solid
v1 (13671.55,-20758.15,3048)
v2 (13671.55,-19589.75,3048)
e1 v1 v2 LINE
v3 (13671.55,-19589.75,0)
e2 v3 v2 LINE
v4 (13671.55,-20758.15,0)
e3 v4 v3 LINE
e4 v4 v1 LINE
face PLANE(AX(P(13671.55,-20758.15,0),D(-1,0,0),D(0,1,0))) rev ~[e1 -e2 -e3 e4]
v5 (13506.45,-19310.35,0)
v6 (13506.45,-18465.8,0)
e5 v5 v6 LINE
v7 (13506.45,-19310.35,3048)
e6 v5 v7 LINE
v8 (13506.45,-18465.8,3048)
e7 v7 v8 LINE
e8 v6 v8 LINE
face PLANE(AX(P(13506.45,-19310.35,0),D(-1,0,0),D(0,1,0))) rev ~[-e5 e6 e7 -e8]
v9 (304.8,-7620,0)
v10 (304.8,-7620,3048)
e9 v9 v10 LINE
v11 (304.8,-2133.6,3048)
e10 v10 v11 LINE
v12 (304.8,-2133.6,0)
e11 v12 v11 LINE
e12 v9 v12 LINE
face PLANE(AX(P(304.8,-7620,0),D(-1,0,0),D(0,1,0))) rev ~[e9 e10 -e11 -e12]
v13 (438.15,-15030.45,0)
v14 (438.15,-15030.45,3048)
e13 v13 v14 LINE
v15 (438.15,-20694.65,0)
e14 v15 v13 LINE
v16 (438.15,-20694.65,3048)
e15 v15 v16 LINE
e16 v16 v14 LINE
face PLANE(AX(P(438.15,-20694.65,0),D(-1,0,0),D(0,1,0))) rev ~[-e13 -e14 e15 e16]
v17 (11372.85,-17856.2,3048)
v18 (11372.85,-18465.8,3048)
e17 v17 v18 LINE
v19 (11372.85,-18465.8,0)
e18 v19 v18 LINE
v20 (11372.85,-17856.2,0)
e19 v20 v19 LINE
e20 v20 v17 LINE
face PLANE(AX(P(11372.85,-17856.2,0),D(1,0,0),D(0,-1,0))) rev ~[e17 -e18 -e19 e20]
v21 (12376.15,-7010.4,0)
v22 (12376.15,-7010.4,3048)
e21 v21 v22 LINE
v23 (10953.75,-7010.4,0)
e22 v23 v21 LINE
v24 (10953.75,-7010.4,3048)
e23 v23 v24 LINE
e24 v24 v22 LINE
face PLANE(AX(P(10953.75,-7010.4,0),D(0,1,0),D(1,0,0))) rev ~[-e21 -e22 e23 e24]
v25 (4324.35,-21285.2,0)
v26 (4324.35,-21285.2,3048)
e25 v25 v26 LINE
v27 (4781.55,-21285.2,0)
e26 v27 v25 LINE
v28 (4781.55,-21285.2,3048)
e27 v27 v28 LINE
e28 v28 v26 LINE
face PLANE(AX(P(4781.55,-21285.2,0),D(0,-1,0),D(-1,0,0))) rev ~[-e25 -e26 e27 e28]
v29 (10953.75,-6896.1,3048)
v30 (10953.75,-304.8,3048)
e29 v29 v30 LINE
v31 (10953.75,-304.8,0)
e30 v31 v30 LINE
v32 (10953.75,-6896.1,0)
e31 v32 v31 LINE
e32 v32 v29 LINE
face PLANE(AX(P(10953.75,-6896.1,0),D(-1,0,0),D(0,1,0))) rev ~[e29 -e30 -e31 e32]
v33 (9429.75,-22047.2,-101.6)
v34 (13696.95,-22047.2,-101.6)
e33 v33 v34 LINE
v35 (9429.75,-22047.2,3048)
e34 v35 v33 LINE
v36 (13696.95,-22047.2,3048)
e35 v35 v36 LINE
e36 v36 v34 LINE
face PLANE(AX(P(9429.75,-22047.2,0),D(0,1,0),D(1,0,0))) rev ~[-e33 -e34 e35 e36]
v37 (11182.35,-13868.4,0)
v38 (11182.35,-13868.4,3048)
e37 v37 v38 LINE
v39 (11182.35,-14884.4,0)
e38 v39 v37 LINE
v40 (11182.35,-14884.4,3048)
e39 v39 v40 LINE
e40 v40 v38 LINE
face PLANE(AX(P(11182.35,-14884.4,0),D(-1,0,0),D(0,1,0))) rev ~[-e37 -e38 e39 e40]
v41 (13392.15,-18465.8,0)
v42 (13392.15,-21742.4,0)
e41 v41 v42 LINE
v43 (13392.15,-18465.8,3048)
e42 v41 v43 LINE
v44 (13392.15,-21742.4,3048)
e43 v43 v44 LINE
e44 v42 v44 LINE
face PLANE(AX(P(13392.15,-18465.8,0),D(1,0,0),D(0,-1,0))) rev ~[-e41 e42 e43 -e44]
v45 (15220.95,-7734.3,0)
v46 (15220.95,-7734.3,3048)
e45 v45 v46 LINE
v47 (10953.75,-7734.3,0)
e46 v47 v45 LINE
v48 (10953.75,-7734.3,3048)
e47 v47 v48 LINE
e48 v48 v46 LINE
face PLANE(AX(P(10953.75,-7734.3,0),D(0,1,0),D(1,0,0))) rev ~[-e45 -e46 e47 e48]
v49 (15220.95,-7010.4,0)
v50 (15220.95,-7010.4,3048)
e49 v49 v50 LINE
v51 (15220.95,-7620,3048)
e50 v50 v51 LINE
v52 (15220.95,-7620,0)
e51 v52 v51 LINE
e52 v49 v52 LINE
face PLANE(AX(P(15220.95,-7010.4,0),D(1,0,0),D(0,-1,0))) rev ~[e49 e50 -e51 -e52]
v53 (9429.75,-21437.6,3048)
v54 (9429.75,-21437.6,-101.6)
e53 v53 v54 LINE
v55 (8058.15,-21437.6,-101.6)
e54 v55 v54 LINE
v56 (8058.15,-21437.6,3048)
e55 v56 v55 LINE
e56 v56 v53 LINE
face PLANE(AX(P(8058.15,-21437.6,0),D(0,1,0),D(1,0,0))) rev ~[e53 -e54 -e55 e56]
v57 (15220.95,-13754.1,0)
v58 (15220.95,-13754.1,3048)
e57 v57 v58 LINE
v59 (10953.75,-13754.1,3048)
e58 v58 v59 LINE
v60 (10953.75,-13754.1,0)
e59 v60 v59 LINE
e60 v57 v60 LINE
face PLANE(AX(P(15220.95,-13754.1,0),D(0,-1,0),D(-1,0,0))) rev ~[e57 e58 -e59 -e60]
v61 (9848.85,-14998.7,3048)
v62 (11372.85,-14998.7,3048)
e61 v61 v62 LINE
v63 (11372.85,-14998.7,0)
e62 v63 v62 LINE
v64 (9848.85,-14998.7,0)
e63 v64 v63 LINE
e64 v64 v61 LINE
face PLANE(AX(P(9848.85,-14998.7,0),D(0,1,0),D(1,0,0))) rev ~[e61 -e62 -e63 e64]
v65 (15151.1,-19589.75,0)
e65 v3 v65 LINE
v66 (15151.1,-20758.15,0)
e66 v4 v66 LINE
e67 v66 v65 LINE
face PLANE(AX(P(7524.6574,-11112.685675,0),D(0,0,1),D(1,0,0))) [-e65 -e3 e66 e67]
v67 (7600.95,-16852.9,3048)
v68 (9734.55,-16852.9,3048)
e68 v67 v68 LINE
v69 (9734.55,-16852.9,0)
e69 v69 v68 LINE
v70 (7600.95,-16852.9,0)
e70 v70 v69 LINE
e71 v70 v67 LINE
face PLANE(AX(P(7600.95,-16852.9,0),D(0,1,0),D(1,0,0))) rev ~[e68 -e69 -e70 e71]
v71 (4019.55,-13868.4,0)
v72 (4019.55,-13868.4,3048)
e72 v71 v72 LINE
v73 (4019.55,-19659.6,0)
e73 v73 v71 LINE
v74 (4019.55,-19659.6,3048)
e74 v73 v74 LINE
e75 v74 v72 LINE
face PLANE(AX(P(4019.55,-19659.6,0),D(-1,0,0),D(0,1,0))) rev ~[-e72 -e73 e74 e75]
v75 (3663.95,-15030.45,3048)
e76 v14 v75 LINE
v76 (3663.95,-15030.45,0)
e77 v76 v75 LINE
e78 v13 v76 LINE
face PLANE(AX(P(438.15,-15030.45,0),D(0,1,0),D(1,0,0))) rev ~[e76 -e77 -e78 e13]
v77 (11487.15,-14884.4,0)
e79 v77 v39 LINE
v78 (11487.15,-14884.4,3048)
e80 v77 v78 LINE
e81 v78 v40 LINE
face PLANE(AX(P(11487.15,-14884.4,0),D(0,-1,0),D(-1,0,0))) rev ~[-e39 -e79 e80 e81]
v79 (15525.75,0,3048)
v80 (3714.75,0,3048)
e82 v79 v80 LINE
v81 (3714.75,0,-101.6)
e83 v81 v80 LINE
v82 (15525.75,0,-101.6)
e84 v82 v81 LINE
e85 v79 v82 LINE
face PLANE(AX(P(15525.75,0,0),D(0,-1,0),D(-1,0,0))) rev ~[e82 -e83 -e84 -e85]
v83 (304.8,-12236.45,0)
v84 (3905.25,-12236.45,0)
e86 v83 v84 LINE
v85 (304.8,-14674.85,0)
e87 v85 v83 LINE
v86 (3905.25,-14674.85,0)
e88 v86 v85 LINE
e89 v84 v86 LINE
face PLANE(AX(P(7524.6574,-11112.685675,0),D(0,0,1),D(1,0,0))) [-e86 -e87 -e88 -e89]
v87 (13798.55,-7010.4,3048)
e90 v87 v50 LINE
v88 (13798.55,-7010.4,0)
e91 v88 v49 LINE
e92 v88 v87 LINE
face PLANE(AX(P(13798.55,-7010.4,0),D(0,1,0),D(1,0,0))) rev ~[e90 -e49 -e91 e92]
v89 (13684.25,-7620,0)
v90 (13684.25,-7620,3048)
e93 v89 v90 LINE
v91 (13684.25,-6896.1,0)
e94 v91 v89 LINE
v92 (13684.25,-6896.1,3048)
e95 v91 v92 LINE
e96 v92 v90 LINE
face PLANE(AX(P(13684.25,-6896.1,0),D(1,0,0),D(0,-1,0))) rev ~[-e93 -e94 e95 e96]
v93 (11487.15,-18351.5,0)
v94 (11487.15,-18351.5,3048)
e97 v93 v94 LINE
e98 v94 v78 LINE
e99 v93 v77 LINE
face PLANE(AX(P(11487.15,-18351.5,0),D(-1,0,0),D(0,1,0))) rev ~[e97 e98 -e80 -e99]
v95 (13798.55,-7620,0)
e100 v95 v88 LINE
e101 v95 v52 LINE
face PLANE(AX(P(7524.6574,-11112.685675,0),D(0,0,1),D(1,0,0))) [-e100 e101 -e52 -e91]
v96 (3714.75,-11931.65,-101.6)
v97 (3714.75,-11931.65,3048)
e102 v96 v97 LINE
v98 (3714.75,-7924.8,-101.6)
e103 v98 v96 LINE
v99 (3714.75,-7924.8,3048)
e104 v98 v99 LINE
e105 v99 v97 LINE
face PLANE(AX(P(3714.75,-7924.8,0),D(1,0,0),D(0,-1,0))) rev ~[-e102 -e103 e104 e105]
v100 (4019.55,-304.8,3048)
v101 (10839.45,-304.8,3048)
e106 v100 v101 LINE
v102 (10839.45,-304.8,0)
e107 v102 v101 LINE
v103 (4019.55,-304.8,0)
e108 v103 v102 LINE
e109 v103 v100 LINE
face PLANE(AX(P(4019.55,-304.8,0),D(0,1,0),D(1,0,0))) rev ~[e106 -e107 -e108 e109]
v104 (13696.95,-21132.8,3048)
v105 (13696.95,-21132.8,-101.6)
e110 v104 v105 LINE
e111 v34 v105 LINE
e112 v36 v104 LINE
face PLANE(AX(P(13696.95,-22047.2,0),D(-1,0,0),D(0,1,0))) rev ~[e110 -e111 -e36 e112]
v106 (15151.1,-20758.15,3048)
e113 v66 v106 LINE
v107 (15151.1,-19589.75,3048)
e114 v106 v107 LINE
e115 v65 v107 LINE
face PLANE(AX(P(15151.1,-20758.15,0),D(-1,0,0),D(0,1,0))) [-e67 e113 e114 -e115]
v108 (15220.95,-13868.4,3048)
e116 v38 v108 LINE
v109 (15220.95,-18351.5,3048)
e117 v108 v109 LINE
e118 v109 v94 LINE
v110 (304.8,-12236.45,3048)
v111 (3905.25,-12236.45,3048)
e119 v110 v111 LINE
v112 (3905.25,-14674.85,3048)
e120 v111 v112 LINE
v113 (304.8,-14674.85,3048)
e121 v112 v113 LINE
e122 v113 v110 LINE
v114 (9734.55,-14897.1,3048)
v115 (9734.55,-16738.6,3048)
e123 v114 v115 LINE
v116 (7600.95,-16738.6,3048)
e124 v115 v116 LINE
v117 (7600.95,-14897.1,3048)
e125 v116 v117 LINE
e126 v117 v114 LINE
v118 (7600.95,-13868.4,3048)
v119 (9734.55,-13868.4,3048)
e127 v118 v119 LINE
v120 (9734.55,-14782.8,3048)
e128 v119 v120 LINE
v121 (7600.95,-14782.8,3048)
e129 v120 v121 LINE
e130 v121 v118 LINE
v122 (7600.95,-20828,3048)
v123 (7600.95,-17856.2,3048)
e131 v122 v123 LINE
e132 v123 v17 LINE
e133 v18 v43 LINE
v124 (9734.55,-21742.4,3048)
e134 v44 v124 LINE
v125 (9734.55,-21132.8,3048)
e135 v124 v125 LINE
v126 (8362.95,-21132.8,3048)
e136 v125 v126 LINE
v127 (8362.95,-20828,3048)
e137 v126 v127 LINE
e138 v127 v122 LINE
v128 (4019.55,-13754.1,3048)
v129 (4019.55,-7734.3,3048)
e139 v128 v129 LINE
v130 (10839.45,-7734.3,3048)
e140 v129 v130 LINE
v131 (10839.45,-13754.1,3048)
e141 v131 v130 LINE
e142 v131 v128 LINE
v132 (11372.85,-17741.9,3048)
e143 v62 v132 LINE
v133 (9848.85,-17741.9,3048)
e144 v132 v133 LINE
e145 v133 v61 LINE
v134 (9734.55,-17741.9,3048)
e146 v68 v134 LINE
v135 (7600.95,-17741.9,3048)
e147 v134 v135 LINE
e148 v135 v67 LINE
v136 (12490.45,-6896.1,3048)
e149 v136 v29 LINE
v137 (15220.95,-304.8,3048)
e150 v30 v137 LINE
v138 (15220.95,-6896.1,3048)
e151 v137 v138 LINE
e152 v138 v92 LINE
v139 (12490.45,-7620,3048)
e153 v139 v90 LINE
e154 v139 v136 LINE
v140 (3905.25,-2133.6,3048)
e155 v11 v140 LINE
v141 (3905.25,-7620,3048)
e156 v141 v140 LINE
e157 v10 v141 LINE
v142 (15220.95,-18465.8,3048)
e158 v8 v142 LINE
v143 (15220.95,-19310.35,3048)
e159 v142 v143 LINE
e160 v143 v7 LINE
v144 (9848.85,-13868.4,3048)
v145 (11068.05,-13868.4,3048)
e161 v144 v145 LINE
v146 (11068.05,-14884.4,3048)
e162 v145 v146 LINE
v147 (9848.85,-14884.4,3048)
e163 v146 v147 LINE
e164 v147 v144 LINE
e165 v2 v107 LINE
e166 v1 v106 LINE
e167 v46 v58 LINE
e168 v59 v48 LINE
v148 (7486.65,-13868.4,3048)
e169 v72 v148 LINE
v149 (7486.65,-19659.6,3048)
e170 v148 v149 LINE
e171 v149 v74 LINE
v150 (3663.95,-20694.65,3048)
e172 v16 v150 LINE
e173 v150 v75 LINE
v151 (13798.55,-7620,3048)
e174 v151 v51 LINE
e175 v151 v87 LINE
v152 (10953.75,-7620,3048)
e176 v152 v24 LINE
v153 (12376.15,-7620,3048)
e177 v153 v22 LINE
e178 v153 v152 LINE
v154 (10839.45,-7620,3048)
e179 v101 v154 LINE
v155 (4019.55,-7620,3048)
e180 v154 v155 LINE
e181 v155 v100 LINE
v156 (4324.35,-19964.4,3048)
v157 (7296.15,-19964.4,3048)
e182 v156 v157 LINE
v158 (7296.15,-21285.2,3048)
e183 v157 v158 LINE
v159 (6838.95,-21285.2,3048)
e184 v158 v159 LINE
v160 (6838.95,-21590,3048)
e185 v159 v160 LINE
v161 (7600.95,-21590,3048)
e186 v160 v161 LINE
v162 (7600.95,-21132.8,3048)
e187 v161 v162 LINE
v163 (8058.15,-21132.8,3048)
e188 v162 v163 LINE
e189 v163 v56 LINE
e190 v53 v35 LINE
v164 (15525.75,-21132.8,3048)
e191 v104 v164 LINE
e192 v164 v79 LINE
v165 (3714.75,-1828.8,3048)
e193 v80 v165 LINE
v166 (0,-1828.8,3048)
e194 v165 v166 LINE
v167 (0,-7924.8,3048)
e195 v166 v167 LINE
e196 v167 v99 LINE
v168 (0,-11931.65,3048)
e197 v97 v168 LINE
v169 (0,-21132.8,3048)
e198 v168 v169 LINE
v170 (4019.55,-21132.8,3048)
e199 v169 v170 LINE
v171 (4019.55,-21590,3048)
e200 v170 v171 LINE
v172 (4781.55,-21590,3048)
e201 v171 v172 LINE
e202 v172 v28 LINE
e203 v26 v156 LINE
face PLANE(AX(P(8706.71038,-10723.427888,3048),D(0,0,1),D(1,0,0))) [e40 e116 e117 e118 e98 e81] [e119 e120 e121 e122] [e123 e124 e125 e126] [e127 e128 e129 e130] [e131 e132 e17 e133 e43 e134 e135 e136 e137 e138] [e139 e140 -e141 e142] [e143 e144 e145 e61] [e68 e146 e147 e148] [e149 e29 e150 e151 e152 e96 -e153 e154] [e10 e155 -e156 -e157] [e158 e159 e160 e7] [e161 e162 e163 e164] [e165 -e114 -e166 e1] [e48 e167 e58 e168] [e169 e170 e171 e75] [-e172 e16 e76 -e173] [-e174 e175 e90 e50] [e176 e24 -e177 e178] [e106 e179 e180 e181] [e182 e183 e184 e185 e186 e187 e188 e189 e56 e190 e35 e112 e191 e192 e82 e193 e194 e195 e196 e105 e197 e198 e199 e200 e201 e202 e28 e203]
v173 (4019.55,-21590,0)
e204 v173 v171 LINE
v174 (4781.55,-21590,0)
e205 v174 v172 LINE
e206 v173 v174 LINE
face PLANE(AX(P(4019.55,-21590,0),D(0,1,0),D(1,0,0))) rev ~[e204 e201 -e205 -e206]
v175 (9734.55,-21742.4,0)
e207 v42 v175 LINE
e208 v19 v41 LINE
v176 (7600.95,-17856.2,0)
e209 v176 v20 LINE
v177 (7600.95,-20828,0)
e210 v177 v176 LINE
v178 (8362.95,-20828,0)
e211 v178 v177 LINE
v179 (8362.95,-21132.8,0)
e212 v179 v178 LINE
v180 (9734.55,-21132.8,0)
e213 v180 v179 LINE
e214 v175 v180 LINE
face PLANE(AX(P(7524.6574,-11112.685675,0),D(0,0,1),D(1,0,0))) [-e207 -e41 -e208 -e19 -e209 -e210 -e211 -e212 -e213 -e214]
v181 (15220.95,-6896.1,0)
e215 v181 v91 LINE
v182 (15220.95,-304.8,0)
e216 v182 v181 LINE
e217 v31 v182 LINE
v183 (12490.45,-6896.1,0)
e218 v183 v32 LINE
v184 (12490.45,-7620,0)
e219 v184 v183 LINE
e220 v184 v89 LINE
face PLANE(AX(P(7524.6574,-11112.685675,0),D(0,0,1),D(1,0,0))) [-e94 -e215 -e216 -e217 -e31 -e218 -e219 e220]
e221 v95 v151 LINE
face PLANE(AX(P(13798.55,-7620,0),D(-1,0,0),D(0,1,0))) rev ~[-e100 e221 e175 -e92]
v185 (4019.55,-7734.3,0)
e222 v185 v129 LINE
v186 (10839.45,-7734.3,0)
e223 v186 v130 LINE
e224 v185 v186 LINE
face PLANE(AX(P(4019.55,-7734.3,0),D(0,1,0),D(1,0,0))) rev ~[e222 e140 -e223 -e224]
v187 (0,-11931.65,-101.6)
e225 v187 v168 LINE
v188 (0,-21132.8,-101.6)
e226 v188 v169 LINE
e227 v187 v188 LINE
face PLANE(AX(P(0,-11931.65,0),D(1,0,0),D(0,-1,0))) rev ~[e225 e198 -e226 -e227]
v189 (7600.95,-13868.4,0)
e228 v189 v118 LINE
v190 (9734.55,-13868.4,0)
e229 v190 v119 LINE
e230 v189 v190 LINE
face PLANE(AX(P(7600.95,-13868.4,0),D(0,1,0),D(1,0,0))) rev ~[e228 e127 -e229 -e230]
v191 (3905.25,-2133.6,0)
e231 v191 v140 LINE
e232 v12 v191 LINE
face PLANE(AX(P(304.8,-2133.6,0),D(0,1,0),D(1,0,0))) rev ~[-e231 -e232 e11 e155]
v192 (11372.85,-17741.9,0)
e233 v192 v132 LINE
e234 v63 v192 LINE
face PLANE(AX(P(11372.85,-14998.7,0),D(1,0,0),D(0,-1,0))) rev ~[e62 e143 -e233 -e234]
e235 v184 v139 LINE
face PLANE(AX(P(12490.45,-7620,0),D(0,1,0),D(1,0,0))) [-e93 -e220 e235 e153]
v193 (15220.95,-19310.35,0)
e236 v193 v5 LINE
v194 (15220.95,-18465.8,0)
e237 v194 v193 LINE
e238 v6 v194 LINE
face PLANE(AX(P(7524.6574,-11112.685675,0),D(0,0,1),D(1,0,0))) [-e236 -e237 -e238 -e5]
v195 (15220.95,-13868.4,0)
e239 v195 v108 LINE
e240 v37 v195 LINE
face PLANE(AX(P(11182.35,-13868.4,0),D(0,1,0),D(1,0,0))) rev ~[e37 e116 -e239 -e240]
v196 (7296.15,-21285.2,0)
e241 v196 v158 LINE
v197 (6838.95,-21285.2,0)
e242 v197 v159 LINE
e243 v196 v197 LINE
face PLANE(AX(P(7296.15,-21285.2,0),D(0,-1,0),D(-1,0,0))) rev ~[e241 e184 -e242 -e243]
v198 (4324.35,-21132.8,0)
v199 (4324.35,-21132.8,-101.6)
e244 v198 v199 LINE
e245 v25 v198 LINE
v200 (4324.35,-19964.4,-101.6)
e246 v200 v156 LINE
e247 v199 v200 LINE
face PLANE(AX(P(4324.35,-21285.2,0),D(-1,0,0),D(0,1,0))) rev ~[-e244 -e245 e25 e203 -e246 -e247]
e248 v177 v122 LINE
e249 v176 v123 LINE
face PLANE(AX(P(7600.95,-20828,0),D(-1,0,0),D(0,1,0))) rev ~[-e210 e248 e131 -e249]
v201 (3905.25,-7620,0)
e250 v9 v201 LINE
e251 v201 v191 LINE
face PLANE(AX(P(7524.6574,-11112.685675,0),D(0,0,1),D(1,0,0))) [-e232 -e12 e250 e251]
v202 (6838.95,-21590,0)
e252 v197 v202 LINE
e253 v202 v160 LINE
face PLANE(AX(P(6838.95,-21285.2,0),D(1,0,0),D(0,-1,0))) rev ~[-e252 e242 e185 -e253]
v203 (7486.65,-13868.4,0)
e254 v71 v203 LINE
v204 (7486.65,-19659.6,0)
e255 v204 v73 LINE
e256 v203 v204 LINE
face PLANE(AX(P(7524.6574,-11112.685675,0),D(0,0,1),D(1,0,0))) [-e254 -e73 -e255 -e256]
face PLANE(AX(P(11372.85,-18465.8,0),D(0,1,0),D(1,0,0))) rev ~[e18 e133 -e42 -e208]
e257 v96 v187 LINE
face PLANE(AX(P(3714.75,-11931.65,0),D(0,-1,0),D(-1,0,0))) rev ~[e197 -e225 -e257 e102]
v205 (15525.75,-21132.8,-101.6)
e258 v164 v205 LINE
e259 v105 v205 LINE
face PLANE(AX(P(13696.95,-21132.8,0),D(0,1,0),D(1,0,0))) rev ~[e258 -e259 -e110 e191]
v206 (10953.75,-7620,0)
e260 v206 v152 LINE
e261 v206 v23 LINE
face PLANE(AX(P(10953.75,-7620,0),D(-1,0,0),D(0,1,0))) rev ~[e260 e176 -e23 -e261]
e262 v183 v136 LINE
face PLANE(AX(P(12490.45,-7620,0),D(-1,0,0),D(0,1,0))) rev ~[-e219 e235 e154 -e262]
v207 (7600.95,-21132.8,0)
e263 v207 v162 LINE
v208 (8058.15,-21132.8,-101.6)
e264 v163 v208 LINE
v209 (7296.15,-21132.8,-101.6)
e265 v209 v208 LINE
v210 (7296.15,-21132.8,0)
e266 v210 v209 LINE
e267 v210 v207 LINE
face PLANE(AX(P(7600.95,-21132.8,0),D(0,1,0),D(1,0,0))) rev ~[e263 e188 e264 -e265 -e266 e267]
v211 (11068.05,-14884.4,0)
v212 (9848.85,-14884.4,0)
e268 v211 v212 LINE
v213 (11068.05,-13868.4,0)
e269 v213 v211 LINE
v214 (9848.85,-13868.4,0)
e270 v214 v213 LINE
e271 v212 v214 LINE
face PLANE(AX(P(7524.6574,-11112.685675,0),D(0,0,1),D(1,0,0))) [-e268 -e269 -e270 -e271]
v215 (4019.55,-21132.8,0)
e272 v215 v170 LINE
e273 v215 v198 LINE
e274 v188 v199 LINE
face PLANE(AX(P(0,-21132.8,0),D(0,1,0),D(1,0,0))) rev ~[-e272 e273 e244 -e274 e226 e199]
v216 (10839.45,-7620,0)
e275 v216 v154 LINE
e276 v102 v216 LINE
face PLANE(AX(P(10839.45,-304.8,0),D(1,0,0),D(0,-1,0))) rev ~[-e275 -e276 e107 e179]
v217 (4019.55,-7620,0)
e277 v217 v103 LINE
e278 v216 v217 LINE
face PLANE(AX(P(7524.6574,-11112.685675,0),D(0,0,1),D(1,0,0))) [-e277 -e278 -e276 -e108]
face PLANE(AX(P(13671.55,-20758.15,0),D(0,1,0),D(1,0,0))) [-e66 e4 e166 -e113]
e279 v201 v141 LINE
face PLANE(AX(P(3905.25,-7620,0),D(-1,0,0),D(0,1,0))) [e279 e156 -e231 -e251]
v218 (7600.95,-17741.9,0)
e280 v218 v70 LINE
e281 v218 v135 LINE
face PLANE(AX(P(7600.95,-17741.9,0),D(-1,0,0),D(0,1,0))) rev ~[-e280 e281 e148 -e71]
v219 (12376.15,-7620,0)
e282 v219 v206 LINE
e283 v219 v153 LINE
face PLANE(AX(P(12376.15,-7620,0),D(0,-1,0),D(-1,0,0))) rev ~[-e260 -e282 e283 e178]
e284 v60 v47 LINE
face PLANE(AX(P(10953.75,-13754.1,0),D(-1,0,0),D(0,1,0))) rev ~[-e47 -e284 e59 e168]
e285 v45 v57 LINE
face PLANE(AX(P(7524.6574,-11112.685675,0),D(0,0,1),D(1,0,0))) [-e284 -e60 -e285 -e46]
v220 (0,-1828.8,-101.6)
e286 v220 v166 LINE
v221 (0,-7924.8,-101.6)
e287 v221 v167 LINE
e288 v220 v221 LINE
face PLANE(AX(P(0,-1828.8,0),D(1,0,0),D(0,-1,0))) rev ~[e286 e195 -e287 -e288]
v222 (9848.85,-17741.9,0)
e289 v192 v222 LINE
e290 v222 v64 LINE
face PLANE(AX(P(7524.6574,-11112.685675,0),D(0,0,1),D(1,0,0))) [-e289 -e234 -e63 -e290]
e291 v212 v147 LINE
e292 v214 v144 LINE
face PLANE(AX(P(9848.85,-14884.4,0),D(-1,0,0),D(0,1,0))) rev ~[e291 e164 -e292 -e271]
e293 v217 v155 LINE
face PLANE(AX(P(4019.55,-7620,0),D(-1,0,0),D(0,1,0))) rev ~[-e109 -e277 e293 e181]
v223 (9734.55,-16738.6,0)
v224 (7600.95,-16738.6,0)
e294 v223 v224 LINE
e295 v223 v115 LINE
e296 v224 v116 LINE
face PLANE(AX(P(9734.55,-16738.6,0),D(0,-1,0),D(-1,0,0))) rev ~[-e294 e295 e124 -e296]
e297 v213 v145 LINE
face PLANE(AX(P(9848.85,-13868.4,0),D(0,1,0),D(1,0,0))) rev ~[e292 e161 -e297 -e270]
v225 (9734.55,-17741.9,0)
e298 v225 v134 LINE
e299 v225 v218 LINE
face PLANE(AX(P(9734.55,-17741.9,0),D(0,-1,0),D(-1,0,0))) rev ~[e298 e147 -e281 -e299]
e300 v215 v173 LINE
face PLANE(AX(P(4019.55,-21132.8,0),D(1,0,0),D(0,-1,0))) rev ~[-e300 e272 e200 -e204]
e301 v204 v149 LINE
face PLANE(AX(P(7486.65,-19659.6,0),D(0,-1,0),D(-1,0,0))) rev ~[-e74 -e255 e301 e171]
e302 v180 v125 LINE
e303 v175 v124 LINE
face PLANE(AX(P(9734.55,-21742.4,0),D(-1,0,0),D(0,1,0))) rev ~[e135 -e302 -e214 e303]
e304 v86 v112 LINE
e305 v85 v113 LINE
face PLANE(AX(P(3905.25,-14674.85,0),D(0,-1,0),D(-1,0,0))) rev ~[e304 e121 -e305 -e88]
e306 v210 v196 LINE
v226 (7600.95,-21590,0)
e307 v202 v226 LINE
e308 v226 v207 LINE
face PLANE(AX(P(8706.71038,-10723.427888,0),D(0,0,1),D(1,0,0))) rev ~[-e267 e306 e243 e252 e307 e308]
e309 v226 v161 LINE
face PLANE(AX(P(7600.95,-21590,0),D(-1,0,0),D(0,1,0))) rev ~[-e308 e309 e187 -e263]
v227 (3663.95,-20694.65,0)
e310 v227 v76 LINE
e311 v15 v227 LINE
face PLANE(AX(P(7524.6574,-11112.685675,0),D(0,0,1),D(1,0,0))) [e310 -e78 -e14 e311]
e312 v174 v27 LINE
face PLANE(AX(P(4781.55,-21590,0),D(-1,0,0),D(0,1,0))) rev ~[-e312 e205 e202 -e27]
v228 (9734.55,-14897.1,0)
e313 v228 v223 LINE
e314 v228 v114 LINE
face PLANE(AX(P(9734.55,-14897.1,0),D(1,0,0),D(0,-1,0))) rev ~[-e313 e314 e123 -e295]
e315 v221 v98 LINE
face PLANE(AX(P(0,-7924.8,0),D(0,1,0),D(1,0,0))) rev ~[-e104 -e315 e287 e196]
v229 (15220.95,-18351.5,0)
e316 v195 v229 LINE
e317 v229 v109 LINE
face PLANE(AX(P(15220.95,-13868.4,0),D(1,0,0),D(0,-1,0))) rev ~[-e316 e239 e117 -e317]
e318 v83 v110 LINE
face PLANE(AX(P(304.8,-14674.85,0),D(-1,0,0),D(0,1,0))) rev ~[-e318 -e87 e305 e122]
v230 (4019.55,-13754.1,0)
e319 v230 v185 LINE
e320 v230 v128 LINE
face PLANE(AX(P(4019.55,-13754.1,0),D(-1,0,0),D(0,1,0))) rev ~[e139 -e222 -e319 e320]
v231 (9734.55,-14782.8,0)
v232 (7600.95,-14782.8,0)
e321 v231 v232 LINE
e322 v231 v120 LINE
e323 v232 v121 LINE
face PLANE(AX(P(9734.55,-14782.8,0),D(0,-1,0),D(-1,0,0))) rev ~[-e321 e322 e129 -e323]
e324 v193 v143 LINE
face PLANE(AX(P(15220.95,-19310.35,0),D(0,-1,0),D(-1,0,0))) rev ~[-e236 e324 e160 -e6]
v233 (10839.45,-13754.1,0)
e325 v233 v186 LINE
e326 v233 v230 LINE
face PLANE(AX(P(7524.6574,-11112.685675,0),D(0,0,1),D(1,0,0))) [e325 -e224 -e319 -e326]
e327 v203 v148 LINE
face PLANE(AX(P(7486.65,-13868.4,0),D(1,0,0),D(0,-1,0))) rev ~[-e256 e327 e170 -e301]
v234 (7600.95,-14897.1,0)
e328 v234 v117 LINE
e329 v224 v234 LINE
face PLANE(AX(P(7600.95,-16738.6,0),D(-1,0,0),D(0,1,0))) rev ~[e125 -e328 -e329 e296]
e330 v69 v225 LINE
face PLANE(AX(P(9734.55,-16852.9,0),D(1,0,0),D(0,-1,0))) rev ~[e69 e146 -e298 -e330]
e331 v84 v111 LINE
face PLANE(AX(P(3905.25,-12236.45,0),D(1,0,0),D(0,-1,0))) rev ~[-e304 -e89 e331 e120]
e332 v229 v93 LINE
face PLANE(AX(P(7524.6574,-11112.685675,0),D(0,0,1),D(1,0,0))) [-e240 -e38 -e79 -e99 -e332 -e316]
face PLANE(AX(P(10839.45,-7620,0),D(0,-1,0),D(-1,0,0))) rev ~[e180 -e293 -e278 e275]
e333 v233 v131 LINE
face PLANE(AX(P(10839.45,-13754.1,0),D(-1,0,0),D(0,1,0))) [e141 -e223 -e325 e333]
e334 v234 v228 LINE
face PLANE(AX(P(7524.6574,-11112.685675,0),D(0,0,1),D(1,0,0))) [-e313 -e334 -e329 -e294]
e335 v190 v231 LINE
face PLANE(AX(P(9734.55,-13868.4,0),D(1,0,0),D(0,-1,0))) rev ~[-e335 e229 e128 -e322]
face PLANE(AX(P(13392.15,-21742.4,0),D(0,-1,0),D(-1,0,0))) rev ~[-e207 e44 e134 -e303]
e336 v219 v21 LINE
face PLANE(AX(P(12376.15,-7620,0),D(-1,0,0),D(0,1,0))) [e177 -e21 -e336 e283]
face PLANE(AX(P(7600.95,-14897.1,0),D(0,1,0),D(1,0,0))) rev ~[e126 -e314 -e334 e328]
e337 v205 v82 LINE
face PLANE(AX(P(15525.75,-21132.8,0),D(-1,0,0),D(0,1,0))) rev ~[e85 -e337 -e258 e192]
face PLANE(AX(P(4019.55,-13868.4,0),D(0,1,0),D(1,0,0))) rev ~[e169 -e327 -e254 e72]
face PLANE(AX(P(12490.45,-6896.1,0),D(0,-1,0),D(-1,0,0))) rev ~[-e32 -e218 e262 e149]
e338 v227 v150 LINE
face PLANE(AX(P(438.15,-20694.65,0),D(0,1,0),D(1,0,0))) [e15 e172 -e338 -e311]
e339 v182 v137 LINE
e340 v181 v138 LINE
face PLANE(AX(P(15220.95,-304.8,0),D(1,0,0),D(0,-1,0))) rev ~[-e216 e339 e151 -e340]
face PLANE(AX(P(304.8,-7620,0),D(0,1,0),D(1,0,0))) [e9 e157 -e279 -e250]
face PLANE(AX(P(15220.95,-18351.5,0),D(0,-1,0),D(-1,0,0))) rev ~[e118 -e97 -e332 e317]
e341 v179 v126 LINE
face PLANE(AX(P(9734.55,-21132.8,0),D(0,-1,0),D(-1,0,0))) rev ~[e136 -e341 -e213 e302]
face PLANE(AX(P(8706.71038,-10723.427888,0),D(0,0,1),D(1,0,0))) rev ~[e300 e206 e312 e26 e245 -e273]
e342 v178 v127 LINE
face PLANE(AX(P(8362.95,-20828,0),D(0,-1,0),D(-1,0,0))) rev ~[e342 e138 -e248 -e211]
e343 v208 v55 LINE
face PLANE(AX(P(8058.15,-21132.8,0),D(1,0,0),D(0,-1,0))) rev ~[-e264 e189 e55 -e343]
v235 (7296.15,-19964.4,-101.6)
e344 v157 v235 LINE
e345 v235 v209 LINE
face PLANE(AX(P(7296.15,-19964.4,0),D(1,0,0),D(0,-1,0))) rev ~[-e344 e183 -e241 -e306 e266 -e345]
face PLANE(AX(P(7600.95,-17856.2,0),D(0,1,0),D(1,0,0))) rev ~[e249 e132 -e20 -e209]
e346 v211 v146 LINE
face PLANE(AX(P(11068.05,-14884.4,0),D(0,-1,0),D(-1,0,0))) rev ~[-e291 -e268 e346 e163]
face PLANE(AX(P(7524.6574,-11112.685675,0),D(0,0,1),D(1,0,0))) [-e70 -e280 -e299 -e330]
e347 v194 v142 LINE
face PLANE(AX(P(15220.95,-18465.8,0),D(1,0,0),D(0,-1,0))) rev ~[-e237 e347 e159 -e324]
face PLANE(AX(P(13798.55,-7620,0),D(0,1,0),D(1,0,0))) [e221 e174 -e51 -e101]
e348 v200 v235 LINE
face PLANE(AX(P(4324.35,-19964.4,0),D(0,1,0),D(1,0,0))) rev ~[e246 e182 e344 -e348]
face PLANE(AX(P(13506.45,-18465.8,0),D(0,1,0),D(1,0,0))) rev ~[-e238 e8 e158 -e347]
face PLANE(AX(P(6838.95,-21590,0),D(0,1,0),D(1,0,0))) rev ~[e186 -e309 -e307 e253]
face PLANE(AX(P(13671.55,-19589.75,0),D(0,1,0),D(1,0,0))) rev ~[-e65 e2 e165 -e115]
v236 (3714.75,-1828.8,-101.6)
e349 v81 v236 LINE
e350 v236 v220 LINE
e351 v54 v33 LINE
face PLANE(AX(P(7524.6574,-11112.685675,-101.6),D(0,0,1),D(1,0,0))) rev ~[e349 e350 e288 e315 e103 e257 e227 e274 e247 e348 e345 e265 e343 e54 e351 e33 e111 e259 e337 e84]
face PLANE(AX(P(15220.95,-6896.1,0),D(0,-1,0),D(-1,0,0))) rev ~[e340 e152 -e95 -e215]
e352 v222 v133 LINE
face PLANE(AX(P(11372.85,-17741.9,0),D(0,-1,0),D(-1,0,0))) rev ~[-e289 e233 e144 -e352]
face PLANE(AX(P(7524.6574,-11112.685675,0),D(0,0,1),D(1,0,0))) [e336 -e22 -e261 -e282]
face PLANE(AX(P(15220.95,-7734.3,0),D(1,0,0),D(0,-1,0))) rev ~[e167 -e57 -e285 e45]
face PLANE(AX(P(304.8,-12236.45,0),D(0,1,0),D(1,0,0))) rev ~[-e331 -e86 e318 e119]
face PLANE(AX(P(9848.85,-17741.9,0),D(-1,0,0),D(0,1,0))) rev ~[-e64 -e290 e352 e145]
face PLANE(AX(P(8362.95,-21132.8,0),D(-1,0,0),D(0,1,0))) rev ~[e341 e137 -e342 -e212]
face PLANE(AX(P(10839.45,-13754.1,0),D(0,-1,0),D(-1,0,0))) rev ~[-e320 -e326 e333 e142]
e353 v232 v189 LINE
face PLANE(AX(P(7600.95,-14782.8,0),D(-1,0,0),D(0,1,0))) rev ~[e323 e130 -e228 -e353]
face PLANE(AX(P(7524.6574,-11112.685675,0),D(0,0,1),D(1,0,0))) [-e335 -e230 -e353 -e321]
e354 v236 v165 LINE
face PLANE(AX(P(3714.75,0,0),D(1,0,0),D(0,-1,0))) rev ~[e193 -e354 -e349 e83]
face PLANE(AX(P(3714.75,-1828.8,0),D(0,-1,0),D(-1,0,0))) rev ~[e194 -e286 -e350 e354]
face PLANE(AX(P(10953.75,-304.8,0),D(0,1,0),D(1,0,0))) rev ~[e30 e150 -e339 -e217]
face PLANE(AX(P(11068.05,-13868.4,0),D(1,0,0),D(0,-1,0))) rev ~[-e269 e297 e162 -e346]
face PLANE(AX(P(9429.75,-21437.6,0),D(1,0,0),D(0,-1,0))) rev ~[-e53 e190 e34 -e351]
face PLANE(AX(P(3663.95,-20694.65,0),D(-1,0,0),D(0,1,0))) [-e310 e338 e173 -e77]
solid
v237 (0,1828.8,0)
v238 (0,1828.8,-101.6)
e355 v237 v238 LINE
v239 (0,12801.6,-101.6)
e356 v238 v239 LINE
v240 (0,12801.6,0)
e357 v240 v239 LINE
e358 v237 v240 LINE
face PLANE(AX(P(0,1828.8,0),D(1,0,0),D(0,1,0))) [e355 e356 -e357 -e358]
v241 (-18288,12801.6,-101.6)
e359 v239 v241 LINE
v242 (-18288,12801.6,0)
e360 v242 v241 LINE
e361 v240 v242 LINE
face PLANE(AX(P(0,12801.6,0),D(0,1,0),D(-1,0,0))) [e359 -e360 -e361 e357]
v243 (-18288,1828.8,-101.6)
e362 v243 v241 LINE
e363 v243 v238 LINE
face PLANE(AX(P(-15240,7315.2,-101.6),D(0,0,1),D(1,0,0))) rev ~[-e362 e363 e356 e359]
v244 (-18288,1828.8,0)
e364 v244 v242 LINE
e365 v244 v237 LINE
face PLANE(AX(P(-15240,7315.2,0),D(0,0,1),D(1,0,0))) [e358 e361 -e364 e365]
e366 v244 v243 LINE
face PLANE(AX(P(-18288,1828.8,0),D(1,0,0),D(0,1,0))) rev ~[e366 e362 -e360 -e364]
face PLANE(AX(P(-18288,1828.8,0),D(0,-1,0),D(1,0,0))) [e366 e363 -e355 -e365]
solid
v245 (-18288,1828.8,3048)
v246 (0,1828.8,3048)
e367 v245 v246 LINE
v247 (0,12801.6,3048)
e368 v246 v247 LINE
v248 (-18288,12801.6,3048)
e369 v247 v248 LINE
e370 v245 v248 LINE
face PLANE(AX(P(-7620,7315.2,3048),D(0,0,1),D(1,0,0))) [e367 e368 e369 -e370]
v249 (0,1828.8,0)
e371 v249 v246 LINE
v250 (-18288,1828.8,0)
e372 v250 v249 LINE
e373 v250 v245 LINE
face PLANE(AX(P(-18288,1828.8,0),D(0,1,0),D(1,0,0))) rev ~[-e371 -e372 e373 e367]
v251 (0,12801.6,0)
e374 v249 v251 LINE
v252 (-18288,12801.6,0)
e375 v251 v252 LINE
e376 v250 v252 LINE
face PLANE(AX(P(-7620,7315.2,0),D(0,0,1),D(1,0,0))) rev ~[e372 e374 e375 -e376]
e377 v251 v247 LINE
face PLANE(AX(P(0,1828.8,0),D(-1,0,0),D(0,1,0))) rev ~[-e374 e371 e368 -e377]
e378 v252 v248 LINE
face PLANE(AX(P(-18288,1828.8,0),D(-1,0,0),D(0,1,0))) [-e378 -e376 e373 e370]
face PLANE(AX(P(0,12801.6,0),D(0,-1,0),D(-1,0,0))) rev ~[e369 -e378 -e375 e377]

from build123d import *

# Parameters (mm, degrees)
F2_DEPTH = 101.6
F0_W     = 6096
F0_H     = 10972.8
F0_W_2   = 9144
F0_W_3   = 3048
F0_W_4   = 3600.45
F0_H_2   = 5486.4
F0_W_5   = 3225.8
F0_H_3   = 5664.2
F0_W_6   = 114.3
F0_H_4   = 6019.8
F0_H_5   = 609.6
F0_W_7   = 1422.4
F0_H_6   = 114.3
F0_W_8   = 1193.8
F0_H_7   = 76.2
F0_H_8   = 863.6
F0_W_9   = 254
F0_W_10  = 1219.2
F0_H_9   = 844.55
F0_W_11  = 1479.55
F0_H_10  = 1168.4
F3_DEPTH = 3048


with BuildPart() as f2:
    # F1 (on Top) → F2 (new body)
    with BuildSketch(Plane.XY):
        Polygon((3714.75, -11931.65), (0, -11931.65), (0, -21132.8), (4324.35, -21132.8), (4324.35, -19964.4), (7296.15, -19964.4), (7296.15, -21132.8), (8058.15, -21132.8), (8058.15, -21437.6), (9429.75, -21437.6), (9429.75, -22047.2), (13696.95, -22047.2), (13696.95, -21132.8), (15525.75, -21132.8), (15525.75, 0), (3714.75, 0), (3714.75, -1828.8), (0, -1828.8), (0, -7924.8), (3714.75, -7924.8), align=None)
    extrude(amount=-F2_DEPTH)

    # F0 (on Top) → F3 (join)
    with BuildSketch(Plane.XY):
        Polygon((15525.75, 0), (3714.75, 0), (3714.75, -1828.8), (0, -1828.8), (0, -7924.8), (3714.75, -7924.8), (3714.75, -11931.65), (0, -11931.65), (0, -14674.85), (304.8, -14674.85), (304.8, -12236.45), (3905.25, -12236.45), (3905.25, -14674.85), (4019.55, -14674.85), (4019.55, -13868.4), (4019.55, -13754.1), (4019.55, -7734.3), (4019.55, -7620), (4019.55, -304.8), (10839.45, -304.8), (10953.75, -304.8), (15220.95, -304.8), (15220.95, -6896.1), (15220.95, -7010.4), (15220.95, -7620), (15220.95, -7734.3), (15220.95, -13754.1), (15220.95, -13868.4), (15220.95, -18351.5), (15220.95, -18465.8), (15220.95, -19310.35), (15430.5, -19310.35), (15430.5, -21037.55), (13392.15, -21037.55), (13392.15, -21742.4), (9734.55, -21742.4), (9734.55, -21132.8), (8362.95, -21132.8), (8362.95, -20828), (7600.95, -20828), (7600.95, -19659.6), (7486.65, -19659.6), (4019.55, -19659.6), (4019.55, -21132.8), (4019.55, -21590), (4781.55, -21590), (4781.55, -21285.2), (4324.35, -21285.2), (4324.35, -19964.4), (7296.15, -19964.4), (7296.15, -21285.2), (6838.95, -21285.2), (6838.95, -21590), (7600.95, -21590), (7600.95, -21132.8), (8058.15, -21132.8), (8058.15, -21437.6), (9429.75, -21437.6), (9429.75, -22047.2), (13696.95, -22047.2), (13696.95, -21132.8), (15525.75, -21132.8), align=None)
        with Locations((2105.025, -4876.8)):
            Rectangle(F0_W_4, F0_H_2, mode=Mode.SUBTRACT)
        Polygon((304.8, -14674.85), (0, -14674.85), (0, -21132.8), (4019.55, -21132.8), (4019.55, -19659.6), (4019.55, -14674.85), (3905.25, -14674.85), align=None)
        with Locations((2051.05, -17862.55)):
            Rectangle(F0_W_5, F0_H_3, mode=Mode.SUBTRACT)
        Polygon((10839.45, -304.8), (10839.45, -7620), (10953.75, -7620), (10953.75, -7010.4), (10953.75, -6896.1), (10953.75, -304.8), align=None)
        Polygon((4019.55, -7620), (4019.55, -7734.3), (10839.45, -7734.3), (10953.75, -7734.3), (12376.15, -7734.3), (12376.15, -7620), (10953.75, -7620), (10839.45, -7620), align=None)
        with Locations((10896.6, -10744.2)):
            Rectangle(F0_W_6, F0_H_4)
        with Locations((12433.3, -7315.2)):
            Rectangle(F0_W_6, F0_H_5)
        with Locations((11664.95, -6953.25)):
            Rectangle(F0_W_7, F0_H_6)
        with Locations((12433.3, -6953.25)):
            Rectangle(F0_W_6, F0_H_6)
        with Locations((12433.3, -7677.15)):
            Rectangle(F0_W_6, F0_H_6)
        with Locations((13087.35, -7677.15)):
            Rectangle(F0_W_8, F0_H_6)
        with Locations((14509.75, -6953.25)):
            Rectangle(F0_W_7, F0_H_6)
        with Locations((13741.4, -6953.25)):
            Rectangle(F0_W_6, F0_H_6)
        with Locations((13741.4, -7315.2)):
            Rectangle(F0_W_6, F0_H_5)
        with Locations((13741.4, -7677.15)):
            Rectangle(F0_W_6, F0_H_6)
        with Locations((14509.75, -7677.15)):
            Rectangle(F0_W_7, F0_H_6)
        Polygon((10839.45, -13754.1), (9848.85, -13754.1), (9848.85, -13868.4), (11068.05, -13868.4), (11182.35, -13868.4), (15220.95, -13868.4), (15220.95, -13754.1), (10953.75, -13754.1), align=None)
        with Locations((11125.2, -13906.5)):
            Rectangle(F0_W_6, F0_H_7)
        with Locations((11125.2, -14846.3)):
            Rectangle(F0_W_6, F0_H_7)
        with Locations((11125.2, -14376.4)):
            Rectangle(F0_W_6, F0_H_8)
        Polygon((11372.85, -17741.9), (11372.85, -17856.2), (11487.15, -17856.2), (11487.15, -14884.4), (11182.35, -14884.4), (11068.05, -14884.4), (9848.85, -14884.4), (9848.85, -14998.7), (10763.25, -14998.7), (11372.85, -14998.7), (11372.85, -16217.9), (11372.85, -16929.1), align=None)
        Polygon((4019.55, -13754.1), (4019.55, -13868.4), (7486.65, -13868.4), (7600.95, -13868.4), (8515.35, -13868.4), (9734.55, -13868.4), (9848.85, -13868.4), (9848.85, -13754.1), align=None)
        Polygon((7486.65, -13868.4), (7486.65, -19659.6), (7600.95, -19659.6), (7600.95, -17856.2), (7600.95, -17741.9), (7600.95, -16852.9), (7600.95, -16738.6), (7600.95, -14897.1), (7600.95, -14782.8), (7600.95, -13868.4), align=None)
        Polygon((8515.35, -14782.8), (7600.95, -14782.8), (7600.95, -14897.1), (9124.95, -14897.1), (9734.55, -14897.1), (9734.55, -14782.8), align=None)
        Polygon((7600.95, -16738.6), (7600.95, -16852.9), (9734.55, -16852.9), (9734.55, -16738.6), (9124.95, -16738.6), align=None)
        Polygon((7600.95, -17741.9), (7600.95, -17856.2), (11372.85, -17856.2), (11372.85, -17741.9), (9848.85, -17741.9), (9734.55, -17741.9), align=None)
        Polygon((9848.85, -14884.4), (9848.85, -13868.4), (9734.55, -13868.4), (9734.55, -14782.8), (9734.55, -14897.1), (9734.55, -16738.6), (9734.55, -16852.9), (9734.55, -17741.9), (9848.85, -17741.9), (9848.85, -16929.1), (9848.85, -14998.7), align=None)
        Polygon((11487.15, -17856.2), (11372.85, -17856.2), (11372.85, -18465.8), (13392.15, -18465.8), (13506.45, -18465.8), (13747.75, -18465.8), (13747.75, -18351.5), (11487.15, -18351.5), align=None)
        with Locations((15093.95, -18408.65)):
            Rectangle(F0_W_9, F0_H_6)
        with Locations((14357.35, -18408.65)):
            Rectangle(F0_W_10, F0_H_6)
        with Locations((13449.3, -18888.075)):
            Rectangle(F0_W_6, F0_H_9)
        Polygon((13506.45, -19310.35), (13392.15, -19310.35), (13392.15, -21037.55), (15430.5, -21037.55), (15430.5, -19310.35), (15220.95, -19310.35), align=None)
        with Locations((14411.325, -20173.95)):
            Rectangle(F0_W_11, F0_H_10, mode=Mode.SUBTRACT)
    extrude(amount=F3_DEPTH)


with BuildPart() as f2b:
    # F0 (on Top) → F2, piece 2 (new body)
    with BuildSketch(Plane.XY):
        with Locations((-15240, 7315.2)):
            Rectangle(F0_W, F0_H)
        with Locations((-7620, 7315.2)):
            Rectangle(F0_W_2, F0_H)
        with Locations((-1524, 7315.2)):
            Rectangle(F0_W_3, F0_H)
    extrude(amount=-F2_DEPTH)


with BuildPart() as f3:
    # F0 (on Top) → F3, piece 2 (new body)
    with BuildSketch(Plane.XY):
        with Locations((-7620, 7315.2)):
            Rectangle(F0_W_2, F0_H)
        with Locations((-1524, 7315.2)):
            Rectangle(F0_W_3, F0_H)
        with Locations((-15240, 7315.2)):
            Rectangle(F0_W, F0_H)
    extrude(amount=F3_DEPTH)


solid = Compound([f2.part, f2b.part, f3.part])
